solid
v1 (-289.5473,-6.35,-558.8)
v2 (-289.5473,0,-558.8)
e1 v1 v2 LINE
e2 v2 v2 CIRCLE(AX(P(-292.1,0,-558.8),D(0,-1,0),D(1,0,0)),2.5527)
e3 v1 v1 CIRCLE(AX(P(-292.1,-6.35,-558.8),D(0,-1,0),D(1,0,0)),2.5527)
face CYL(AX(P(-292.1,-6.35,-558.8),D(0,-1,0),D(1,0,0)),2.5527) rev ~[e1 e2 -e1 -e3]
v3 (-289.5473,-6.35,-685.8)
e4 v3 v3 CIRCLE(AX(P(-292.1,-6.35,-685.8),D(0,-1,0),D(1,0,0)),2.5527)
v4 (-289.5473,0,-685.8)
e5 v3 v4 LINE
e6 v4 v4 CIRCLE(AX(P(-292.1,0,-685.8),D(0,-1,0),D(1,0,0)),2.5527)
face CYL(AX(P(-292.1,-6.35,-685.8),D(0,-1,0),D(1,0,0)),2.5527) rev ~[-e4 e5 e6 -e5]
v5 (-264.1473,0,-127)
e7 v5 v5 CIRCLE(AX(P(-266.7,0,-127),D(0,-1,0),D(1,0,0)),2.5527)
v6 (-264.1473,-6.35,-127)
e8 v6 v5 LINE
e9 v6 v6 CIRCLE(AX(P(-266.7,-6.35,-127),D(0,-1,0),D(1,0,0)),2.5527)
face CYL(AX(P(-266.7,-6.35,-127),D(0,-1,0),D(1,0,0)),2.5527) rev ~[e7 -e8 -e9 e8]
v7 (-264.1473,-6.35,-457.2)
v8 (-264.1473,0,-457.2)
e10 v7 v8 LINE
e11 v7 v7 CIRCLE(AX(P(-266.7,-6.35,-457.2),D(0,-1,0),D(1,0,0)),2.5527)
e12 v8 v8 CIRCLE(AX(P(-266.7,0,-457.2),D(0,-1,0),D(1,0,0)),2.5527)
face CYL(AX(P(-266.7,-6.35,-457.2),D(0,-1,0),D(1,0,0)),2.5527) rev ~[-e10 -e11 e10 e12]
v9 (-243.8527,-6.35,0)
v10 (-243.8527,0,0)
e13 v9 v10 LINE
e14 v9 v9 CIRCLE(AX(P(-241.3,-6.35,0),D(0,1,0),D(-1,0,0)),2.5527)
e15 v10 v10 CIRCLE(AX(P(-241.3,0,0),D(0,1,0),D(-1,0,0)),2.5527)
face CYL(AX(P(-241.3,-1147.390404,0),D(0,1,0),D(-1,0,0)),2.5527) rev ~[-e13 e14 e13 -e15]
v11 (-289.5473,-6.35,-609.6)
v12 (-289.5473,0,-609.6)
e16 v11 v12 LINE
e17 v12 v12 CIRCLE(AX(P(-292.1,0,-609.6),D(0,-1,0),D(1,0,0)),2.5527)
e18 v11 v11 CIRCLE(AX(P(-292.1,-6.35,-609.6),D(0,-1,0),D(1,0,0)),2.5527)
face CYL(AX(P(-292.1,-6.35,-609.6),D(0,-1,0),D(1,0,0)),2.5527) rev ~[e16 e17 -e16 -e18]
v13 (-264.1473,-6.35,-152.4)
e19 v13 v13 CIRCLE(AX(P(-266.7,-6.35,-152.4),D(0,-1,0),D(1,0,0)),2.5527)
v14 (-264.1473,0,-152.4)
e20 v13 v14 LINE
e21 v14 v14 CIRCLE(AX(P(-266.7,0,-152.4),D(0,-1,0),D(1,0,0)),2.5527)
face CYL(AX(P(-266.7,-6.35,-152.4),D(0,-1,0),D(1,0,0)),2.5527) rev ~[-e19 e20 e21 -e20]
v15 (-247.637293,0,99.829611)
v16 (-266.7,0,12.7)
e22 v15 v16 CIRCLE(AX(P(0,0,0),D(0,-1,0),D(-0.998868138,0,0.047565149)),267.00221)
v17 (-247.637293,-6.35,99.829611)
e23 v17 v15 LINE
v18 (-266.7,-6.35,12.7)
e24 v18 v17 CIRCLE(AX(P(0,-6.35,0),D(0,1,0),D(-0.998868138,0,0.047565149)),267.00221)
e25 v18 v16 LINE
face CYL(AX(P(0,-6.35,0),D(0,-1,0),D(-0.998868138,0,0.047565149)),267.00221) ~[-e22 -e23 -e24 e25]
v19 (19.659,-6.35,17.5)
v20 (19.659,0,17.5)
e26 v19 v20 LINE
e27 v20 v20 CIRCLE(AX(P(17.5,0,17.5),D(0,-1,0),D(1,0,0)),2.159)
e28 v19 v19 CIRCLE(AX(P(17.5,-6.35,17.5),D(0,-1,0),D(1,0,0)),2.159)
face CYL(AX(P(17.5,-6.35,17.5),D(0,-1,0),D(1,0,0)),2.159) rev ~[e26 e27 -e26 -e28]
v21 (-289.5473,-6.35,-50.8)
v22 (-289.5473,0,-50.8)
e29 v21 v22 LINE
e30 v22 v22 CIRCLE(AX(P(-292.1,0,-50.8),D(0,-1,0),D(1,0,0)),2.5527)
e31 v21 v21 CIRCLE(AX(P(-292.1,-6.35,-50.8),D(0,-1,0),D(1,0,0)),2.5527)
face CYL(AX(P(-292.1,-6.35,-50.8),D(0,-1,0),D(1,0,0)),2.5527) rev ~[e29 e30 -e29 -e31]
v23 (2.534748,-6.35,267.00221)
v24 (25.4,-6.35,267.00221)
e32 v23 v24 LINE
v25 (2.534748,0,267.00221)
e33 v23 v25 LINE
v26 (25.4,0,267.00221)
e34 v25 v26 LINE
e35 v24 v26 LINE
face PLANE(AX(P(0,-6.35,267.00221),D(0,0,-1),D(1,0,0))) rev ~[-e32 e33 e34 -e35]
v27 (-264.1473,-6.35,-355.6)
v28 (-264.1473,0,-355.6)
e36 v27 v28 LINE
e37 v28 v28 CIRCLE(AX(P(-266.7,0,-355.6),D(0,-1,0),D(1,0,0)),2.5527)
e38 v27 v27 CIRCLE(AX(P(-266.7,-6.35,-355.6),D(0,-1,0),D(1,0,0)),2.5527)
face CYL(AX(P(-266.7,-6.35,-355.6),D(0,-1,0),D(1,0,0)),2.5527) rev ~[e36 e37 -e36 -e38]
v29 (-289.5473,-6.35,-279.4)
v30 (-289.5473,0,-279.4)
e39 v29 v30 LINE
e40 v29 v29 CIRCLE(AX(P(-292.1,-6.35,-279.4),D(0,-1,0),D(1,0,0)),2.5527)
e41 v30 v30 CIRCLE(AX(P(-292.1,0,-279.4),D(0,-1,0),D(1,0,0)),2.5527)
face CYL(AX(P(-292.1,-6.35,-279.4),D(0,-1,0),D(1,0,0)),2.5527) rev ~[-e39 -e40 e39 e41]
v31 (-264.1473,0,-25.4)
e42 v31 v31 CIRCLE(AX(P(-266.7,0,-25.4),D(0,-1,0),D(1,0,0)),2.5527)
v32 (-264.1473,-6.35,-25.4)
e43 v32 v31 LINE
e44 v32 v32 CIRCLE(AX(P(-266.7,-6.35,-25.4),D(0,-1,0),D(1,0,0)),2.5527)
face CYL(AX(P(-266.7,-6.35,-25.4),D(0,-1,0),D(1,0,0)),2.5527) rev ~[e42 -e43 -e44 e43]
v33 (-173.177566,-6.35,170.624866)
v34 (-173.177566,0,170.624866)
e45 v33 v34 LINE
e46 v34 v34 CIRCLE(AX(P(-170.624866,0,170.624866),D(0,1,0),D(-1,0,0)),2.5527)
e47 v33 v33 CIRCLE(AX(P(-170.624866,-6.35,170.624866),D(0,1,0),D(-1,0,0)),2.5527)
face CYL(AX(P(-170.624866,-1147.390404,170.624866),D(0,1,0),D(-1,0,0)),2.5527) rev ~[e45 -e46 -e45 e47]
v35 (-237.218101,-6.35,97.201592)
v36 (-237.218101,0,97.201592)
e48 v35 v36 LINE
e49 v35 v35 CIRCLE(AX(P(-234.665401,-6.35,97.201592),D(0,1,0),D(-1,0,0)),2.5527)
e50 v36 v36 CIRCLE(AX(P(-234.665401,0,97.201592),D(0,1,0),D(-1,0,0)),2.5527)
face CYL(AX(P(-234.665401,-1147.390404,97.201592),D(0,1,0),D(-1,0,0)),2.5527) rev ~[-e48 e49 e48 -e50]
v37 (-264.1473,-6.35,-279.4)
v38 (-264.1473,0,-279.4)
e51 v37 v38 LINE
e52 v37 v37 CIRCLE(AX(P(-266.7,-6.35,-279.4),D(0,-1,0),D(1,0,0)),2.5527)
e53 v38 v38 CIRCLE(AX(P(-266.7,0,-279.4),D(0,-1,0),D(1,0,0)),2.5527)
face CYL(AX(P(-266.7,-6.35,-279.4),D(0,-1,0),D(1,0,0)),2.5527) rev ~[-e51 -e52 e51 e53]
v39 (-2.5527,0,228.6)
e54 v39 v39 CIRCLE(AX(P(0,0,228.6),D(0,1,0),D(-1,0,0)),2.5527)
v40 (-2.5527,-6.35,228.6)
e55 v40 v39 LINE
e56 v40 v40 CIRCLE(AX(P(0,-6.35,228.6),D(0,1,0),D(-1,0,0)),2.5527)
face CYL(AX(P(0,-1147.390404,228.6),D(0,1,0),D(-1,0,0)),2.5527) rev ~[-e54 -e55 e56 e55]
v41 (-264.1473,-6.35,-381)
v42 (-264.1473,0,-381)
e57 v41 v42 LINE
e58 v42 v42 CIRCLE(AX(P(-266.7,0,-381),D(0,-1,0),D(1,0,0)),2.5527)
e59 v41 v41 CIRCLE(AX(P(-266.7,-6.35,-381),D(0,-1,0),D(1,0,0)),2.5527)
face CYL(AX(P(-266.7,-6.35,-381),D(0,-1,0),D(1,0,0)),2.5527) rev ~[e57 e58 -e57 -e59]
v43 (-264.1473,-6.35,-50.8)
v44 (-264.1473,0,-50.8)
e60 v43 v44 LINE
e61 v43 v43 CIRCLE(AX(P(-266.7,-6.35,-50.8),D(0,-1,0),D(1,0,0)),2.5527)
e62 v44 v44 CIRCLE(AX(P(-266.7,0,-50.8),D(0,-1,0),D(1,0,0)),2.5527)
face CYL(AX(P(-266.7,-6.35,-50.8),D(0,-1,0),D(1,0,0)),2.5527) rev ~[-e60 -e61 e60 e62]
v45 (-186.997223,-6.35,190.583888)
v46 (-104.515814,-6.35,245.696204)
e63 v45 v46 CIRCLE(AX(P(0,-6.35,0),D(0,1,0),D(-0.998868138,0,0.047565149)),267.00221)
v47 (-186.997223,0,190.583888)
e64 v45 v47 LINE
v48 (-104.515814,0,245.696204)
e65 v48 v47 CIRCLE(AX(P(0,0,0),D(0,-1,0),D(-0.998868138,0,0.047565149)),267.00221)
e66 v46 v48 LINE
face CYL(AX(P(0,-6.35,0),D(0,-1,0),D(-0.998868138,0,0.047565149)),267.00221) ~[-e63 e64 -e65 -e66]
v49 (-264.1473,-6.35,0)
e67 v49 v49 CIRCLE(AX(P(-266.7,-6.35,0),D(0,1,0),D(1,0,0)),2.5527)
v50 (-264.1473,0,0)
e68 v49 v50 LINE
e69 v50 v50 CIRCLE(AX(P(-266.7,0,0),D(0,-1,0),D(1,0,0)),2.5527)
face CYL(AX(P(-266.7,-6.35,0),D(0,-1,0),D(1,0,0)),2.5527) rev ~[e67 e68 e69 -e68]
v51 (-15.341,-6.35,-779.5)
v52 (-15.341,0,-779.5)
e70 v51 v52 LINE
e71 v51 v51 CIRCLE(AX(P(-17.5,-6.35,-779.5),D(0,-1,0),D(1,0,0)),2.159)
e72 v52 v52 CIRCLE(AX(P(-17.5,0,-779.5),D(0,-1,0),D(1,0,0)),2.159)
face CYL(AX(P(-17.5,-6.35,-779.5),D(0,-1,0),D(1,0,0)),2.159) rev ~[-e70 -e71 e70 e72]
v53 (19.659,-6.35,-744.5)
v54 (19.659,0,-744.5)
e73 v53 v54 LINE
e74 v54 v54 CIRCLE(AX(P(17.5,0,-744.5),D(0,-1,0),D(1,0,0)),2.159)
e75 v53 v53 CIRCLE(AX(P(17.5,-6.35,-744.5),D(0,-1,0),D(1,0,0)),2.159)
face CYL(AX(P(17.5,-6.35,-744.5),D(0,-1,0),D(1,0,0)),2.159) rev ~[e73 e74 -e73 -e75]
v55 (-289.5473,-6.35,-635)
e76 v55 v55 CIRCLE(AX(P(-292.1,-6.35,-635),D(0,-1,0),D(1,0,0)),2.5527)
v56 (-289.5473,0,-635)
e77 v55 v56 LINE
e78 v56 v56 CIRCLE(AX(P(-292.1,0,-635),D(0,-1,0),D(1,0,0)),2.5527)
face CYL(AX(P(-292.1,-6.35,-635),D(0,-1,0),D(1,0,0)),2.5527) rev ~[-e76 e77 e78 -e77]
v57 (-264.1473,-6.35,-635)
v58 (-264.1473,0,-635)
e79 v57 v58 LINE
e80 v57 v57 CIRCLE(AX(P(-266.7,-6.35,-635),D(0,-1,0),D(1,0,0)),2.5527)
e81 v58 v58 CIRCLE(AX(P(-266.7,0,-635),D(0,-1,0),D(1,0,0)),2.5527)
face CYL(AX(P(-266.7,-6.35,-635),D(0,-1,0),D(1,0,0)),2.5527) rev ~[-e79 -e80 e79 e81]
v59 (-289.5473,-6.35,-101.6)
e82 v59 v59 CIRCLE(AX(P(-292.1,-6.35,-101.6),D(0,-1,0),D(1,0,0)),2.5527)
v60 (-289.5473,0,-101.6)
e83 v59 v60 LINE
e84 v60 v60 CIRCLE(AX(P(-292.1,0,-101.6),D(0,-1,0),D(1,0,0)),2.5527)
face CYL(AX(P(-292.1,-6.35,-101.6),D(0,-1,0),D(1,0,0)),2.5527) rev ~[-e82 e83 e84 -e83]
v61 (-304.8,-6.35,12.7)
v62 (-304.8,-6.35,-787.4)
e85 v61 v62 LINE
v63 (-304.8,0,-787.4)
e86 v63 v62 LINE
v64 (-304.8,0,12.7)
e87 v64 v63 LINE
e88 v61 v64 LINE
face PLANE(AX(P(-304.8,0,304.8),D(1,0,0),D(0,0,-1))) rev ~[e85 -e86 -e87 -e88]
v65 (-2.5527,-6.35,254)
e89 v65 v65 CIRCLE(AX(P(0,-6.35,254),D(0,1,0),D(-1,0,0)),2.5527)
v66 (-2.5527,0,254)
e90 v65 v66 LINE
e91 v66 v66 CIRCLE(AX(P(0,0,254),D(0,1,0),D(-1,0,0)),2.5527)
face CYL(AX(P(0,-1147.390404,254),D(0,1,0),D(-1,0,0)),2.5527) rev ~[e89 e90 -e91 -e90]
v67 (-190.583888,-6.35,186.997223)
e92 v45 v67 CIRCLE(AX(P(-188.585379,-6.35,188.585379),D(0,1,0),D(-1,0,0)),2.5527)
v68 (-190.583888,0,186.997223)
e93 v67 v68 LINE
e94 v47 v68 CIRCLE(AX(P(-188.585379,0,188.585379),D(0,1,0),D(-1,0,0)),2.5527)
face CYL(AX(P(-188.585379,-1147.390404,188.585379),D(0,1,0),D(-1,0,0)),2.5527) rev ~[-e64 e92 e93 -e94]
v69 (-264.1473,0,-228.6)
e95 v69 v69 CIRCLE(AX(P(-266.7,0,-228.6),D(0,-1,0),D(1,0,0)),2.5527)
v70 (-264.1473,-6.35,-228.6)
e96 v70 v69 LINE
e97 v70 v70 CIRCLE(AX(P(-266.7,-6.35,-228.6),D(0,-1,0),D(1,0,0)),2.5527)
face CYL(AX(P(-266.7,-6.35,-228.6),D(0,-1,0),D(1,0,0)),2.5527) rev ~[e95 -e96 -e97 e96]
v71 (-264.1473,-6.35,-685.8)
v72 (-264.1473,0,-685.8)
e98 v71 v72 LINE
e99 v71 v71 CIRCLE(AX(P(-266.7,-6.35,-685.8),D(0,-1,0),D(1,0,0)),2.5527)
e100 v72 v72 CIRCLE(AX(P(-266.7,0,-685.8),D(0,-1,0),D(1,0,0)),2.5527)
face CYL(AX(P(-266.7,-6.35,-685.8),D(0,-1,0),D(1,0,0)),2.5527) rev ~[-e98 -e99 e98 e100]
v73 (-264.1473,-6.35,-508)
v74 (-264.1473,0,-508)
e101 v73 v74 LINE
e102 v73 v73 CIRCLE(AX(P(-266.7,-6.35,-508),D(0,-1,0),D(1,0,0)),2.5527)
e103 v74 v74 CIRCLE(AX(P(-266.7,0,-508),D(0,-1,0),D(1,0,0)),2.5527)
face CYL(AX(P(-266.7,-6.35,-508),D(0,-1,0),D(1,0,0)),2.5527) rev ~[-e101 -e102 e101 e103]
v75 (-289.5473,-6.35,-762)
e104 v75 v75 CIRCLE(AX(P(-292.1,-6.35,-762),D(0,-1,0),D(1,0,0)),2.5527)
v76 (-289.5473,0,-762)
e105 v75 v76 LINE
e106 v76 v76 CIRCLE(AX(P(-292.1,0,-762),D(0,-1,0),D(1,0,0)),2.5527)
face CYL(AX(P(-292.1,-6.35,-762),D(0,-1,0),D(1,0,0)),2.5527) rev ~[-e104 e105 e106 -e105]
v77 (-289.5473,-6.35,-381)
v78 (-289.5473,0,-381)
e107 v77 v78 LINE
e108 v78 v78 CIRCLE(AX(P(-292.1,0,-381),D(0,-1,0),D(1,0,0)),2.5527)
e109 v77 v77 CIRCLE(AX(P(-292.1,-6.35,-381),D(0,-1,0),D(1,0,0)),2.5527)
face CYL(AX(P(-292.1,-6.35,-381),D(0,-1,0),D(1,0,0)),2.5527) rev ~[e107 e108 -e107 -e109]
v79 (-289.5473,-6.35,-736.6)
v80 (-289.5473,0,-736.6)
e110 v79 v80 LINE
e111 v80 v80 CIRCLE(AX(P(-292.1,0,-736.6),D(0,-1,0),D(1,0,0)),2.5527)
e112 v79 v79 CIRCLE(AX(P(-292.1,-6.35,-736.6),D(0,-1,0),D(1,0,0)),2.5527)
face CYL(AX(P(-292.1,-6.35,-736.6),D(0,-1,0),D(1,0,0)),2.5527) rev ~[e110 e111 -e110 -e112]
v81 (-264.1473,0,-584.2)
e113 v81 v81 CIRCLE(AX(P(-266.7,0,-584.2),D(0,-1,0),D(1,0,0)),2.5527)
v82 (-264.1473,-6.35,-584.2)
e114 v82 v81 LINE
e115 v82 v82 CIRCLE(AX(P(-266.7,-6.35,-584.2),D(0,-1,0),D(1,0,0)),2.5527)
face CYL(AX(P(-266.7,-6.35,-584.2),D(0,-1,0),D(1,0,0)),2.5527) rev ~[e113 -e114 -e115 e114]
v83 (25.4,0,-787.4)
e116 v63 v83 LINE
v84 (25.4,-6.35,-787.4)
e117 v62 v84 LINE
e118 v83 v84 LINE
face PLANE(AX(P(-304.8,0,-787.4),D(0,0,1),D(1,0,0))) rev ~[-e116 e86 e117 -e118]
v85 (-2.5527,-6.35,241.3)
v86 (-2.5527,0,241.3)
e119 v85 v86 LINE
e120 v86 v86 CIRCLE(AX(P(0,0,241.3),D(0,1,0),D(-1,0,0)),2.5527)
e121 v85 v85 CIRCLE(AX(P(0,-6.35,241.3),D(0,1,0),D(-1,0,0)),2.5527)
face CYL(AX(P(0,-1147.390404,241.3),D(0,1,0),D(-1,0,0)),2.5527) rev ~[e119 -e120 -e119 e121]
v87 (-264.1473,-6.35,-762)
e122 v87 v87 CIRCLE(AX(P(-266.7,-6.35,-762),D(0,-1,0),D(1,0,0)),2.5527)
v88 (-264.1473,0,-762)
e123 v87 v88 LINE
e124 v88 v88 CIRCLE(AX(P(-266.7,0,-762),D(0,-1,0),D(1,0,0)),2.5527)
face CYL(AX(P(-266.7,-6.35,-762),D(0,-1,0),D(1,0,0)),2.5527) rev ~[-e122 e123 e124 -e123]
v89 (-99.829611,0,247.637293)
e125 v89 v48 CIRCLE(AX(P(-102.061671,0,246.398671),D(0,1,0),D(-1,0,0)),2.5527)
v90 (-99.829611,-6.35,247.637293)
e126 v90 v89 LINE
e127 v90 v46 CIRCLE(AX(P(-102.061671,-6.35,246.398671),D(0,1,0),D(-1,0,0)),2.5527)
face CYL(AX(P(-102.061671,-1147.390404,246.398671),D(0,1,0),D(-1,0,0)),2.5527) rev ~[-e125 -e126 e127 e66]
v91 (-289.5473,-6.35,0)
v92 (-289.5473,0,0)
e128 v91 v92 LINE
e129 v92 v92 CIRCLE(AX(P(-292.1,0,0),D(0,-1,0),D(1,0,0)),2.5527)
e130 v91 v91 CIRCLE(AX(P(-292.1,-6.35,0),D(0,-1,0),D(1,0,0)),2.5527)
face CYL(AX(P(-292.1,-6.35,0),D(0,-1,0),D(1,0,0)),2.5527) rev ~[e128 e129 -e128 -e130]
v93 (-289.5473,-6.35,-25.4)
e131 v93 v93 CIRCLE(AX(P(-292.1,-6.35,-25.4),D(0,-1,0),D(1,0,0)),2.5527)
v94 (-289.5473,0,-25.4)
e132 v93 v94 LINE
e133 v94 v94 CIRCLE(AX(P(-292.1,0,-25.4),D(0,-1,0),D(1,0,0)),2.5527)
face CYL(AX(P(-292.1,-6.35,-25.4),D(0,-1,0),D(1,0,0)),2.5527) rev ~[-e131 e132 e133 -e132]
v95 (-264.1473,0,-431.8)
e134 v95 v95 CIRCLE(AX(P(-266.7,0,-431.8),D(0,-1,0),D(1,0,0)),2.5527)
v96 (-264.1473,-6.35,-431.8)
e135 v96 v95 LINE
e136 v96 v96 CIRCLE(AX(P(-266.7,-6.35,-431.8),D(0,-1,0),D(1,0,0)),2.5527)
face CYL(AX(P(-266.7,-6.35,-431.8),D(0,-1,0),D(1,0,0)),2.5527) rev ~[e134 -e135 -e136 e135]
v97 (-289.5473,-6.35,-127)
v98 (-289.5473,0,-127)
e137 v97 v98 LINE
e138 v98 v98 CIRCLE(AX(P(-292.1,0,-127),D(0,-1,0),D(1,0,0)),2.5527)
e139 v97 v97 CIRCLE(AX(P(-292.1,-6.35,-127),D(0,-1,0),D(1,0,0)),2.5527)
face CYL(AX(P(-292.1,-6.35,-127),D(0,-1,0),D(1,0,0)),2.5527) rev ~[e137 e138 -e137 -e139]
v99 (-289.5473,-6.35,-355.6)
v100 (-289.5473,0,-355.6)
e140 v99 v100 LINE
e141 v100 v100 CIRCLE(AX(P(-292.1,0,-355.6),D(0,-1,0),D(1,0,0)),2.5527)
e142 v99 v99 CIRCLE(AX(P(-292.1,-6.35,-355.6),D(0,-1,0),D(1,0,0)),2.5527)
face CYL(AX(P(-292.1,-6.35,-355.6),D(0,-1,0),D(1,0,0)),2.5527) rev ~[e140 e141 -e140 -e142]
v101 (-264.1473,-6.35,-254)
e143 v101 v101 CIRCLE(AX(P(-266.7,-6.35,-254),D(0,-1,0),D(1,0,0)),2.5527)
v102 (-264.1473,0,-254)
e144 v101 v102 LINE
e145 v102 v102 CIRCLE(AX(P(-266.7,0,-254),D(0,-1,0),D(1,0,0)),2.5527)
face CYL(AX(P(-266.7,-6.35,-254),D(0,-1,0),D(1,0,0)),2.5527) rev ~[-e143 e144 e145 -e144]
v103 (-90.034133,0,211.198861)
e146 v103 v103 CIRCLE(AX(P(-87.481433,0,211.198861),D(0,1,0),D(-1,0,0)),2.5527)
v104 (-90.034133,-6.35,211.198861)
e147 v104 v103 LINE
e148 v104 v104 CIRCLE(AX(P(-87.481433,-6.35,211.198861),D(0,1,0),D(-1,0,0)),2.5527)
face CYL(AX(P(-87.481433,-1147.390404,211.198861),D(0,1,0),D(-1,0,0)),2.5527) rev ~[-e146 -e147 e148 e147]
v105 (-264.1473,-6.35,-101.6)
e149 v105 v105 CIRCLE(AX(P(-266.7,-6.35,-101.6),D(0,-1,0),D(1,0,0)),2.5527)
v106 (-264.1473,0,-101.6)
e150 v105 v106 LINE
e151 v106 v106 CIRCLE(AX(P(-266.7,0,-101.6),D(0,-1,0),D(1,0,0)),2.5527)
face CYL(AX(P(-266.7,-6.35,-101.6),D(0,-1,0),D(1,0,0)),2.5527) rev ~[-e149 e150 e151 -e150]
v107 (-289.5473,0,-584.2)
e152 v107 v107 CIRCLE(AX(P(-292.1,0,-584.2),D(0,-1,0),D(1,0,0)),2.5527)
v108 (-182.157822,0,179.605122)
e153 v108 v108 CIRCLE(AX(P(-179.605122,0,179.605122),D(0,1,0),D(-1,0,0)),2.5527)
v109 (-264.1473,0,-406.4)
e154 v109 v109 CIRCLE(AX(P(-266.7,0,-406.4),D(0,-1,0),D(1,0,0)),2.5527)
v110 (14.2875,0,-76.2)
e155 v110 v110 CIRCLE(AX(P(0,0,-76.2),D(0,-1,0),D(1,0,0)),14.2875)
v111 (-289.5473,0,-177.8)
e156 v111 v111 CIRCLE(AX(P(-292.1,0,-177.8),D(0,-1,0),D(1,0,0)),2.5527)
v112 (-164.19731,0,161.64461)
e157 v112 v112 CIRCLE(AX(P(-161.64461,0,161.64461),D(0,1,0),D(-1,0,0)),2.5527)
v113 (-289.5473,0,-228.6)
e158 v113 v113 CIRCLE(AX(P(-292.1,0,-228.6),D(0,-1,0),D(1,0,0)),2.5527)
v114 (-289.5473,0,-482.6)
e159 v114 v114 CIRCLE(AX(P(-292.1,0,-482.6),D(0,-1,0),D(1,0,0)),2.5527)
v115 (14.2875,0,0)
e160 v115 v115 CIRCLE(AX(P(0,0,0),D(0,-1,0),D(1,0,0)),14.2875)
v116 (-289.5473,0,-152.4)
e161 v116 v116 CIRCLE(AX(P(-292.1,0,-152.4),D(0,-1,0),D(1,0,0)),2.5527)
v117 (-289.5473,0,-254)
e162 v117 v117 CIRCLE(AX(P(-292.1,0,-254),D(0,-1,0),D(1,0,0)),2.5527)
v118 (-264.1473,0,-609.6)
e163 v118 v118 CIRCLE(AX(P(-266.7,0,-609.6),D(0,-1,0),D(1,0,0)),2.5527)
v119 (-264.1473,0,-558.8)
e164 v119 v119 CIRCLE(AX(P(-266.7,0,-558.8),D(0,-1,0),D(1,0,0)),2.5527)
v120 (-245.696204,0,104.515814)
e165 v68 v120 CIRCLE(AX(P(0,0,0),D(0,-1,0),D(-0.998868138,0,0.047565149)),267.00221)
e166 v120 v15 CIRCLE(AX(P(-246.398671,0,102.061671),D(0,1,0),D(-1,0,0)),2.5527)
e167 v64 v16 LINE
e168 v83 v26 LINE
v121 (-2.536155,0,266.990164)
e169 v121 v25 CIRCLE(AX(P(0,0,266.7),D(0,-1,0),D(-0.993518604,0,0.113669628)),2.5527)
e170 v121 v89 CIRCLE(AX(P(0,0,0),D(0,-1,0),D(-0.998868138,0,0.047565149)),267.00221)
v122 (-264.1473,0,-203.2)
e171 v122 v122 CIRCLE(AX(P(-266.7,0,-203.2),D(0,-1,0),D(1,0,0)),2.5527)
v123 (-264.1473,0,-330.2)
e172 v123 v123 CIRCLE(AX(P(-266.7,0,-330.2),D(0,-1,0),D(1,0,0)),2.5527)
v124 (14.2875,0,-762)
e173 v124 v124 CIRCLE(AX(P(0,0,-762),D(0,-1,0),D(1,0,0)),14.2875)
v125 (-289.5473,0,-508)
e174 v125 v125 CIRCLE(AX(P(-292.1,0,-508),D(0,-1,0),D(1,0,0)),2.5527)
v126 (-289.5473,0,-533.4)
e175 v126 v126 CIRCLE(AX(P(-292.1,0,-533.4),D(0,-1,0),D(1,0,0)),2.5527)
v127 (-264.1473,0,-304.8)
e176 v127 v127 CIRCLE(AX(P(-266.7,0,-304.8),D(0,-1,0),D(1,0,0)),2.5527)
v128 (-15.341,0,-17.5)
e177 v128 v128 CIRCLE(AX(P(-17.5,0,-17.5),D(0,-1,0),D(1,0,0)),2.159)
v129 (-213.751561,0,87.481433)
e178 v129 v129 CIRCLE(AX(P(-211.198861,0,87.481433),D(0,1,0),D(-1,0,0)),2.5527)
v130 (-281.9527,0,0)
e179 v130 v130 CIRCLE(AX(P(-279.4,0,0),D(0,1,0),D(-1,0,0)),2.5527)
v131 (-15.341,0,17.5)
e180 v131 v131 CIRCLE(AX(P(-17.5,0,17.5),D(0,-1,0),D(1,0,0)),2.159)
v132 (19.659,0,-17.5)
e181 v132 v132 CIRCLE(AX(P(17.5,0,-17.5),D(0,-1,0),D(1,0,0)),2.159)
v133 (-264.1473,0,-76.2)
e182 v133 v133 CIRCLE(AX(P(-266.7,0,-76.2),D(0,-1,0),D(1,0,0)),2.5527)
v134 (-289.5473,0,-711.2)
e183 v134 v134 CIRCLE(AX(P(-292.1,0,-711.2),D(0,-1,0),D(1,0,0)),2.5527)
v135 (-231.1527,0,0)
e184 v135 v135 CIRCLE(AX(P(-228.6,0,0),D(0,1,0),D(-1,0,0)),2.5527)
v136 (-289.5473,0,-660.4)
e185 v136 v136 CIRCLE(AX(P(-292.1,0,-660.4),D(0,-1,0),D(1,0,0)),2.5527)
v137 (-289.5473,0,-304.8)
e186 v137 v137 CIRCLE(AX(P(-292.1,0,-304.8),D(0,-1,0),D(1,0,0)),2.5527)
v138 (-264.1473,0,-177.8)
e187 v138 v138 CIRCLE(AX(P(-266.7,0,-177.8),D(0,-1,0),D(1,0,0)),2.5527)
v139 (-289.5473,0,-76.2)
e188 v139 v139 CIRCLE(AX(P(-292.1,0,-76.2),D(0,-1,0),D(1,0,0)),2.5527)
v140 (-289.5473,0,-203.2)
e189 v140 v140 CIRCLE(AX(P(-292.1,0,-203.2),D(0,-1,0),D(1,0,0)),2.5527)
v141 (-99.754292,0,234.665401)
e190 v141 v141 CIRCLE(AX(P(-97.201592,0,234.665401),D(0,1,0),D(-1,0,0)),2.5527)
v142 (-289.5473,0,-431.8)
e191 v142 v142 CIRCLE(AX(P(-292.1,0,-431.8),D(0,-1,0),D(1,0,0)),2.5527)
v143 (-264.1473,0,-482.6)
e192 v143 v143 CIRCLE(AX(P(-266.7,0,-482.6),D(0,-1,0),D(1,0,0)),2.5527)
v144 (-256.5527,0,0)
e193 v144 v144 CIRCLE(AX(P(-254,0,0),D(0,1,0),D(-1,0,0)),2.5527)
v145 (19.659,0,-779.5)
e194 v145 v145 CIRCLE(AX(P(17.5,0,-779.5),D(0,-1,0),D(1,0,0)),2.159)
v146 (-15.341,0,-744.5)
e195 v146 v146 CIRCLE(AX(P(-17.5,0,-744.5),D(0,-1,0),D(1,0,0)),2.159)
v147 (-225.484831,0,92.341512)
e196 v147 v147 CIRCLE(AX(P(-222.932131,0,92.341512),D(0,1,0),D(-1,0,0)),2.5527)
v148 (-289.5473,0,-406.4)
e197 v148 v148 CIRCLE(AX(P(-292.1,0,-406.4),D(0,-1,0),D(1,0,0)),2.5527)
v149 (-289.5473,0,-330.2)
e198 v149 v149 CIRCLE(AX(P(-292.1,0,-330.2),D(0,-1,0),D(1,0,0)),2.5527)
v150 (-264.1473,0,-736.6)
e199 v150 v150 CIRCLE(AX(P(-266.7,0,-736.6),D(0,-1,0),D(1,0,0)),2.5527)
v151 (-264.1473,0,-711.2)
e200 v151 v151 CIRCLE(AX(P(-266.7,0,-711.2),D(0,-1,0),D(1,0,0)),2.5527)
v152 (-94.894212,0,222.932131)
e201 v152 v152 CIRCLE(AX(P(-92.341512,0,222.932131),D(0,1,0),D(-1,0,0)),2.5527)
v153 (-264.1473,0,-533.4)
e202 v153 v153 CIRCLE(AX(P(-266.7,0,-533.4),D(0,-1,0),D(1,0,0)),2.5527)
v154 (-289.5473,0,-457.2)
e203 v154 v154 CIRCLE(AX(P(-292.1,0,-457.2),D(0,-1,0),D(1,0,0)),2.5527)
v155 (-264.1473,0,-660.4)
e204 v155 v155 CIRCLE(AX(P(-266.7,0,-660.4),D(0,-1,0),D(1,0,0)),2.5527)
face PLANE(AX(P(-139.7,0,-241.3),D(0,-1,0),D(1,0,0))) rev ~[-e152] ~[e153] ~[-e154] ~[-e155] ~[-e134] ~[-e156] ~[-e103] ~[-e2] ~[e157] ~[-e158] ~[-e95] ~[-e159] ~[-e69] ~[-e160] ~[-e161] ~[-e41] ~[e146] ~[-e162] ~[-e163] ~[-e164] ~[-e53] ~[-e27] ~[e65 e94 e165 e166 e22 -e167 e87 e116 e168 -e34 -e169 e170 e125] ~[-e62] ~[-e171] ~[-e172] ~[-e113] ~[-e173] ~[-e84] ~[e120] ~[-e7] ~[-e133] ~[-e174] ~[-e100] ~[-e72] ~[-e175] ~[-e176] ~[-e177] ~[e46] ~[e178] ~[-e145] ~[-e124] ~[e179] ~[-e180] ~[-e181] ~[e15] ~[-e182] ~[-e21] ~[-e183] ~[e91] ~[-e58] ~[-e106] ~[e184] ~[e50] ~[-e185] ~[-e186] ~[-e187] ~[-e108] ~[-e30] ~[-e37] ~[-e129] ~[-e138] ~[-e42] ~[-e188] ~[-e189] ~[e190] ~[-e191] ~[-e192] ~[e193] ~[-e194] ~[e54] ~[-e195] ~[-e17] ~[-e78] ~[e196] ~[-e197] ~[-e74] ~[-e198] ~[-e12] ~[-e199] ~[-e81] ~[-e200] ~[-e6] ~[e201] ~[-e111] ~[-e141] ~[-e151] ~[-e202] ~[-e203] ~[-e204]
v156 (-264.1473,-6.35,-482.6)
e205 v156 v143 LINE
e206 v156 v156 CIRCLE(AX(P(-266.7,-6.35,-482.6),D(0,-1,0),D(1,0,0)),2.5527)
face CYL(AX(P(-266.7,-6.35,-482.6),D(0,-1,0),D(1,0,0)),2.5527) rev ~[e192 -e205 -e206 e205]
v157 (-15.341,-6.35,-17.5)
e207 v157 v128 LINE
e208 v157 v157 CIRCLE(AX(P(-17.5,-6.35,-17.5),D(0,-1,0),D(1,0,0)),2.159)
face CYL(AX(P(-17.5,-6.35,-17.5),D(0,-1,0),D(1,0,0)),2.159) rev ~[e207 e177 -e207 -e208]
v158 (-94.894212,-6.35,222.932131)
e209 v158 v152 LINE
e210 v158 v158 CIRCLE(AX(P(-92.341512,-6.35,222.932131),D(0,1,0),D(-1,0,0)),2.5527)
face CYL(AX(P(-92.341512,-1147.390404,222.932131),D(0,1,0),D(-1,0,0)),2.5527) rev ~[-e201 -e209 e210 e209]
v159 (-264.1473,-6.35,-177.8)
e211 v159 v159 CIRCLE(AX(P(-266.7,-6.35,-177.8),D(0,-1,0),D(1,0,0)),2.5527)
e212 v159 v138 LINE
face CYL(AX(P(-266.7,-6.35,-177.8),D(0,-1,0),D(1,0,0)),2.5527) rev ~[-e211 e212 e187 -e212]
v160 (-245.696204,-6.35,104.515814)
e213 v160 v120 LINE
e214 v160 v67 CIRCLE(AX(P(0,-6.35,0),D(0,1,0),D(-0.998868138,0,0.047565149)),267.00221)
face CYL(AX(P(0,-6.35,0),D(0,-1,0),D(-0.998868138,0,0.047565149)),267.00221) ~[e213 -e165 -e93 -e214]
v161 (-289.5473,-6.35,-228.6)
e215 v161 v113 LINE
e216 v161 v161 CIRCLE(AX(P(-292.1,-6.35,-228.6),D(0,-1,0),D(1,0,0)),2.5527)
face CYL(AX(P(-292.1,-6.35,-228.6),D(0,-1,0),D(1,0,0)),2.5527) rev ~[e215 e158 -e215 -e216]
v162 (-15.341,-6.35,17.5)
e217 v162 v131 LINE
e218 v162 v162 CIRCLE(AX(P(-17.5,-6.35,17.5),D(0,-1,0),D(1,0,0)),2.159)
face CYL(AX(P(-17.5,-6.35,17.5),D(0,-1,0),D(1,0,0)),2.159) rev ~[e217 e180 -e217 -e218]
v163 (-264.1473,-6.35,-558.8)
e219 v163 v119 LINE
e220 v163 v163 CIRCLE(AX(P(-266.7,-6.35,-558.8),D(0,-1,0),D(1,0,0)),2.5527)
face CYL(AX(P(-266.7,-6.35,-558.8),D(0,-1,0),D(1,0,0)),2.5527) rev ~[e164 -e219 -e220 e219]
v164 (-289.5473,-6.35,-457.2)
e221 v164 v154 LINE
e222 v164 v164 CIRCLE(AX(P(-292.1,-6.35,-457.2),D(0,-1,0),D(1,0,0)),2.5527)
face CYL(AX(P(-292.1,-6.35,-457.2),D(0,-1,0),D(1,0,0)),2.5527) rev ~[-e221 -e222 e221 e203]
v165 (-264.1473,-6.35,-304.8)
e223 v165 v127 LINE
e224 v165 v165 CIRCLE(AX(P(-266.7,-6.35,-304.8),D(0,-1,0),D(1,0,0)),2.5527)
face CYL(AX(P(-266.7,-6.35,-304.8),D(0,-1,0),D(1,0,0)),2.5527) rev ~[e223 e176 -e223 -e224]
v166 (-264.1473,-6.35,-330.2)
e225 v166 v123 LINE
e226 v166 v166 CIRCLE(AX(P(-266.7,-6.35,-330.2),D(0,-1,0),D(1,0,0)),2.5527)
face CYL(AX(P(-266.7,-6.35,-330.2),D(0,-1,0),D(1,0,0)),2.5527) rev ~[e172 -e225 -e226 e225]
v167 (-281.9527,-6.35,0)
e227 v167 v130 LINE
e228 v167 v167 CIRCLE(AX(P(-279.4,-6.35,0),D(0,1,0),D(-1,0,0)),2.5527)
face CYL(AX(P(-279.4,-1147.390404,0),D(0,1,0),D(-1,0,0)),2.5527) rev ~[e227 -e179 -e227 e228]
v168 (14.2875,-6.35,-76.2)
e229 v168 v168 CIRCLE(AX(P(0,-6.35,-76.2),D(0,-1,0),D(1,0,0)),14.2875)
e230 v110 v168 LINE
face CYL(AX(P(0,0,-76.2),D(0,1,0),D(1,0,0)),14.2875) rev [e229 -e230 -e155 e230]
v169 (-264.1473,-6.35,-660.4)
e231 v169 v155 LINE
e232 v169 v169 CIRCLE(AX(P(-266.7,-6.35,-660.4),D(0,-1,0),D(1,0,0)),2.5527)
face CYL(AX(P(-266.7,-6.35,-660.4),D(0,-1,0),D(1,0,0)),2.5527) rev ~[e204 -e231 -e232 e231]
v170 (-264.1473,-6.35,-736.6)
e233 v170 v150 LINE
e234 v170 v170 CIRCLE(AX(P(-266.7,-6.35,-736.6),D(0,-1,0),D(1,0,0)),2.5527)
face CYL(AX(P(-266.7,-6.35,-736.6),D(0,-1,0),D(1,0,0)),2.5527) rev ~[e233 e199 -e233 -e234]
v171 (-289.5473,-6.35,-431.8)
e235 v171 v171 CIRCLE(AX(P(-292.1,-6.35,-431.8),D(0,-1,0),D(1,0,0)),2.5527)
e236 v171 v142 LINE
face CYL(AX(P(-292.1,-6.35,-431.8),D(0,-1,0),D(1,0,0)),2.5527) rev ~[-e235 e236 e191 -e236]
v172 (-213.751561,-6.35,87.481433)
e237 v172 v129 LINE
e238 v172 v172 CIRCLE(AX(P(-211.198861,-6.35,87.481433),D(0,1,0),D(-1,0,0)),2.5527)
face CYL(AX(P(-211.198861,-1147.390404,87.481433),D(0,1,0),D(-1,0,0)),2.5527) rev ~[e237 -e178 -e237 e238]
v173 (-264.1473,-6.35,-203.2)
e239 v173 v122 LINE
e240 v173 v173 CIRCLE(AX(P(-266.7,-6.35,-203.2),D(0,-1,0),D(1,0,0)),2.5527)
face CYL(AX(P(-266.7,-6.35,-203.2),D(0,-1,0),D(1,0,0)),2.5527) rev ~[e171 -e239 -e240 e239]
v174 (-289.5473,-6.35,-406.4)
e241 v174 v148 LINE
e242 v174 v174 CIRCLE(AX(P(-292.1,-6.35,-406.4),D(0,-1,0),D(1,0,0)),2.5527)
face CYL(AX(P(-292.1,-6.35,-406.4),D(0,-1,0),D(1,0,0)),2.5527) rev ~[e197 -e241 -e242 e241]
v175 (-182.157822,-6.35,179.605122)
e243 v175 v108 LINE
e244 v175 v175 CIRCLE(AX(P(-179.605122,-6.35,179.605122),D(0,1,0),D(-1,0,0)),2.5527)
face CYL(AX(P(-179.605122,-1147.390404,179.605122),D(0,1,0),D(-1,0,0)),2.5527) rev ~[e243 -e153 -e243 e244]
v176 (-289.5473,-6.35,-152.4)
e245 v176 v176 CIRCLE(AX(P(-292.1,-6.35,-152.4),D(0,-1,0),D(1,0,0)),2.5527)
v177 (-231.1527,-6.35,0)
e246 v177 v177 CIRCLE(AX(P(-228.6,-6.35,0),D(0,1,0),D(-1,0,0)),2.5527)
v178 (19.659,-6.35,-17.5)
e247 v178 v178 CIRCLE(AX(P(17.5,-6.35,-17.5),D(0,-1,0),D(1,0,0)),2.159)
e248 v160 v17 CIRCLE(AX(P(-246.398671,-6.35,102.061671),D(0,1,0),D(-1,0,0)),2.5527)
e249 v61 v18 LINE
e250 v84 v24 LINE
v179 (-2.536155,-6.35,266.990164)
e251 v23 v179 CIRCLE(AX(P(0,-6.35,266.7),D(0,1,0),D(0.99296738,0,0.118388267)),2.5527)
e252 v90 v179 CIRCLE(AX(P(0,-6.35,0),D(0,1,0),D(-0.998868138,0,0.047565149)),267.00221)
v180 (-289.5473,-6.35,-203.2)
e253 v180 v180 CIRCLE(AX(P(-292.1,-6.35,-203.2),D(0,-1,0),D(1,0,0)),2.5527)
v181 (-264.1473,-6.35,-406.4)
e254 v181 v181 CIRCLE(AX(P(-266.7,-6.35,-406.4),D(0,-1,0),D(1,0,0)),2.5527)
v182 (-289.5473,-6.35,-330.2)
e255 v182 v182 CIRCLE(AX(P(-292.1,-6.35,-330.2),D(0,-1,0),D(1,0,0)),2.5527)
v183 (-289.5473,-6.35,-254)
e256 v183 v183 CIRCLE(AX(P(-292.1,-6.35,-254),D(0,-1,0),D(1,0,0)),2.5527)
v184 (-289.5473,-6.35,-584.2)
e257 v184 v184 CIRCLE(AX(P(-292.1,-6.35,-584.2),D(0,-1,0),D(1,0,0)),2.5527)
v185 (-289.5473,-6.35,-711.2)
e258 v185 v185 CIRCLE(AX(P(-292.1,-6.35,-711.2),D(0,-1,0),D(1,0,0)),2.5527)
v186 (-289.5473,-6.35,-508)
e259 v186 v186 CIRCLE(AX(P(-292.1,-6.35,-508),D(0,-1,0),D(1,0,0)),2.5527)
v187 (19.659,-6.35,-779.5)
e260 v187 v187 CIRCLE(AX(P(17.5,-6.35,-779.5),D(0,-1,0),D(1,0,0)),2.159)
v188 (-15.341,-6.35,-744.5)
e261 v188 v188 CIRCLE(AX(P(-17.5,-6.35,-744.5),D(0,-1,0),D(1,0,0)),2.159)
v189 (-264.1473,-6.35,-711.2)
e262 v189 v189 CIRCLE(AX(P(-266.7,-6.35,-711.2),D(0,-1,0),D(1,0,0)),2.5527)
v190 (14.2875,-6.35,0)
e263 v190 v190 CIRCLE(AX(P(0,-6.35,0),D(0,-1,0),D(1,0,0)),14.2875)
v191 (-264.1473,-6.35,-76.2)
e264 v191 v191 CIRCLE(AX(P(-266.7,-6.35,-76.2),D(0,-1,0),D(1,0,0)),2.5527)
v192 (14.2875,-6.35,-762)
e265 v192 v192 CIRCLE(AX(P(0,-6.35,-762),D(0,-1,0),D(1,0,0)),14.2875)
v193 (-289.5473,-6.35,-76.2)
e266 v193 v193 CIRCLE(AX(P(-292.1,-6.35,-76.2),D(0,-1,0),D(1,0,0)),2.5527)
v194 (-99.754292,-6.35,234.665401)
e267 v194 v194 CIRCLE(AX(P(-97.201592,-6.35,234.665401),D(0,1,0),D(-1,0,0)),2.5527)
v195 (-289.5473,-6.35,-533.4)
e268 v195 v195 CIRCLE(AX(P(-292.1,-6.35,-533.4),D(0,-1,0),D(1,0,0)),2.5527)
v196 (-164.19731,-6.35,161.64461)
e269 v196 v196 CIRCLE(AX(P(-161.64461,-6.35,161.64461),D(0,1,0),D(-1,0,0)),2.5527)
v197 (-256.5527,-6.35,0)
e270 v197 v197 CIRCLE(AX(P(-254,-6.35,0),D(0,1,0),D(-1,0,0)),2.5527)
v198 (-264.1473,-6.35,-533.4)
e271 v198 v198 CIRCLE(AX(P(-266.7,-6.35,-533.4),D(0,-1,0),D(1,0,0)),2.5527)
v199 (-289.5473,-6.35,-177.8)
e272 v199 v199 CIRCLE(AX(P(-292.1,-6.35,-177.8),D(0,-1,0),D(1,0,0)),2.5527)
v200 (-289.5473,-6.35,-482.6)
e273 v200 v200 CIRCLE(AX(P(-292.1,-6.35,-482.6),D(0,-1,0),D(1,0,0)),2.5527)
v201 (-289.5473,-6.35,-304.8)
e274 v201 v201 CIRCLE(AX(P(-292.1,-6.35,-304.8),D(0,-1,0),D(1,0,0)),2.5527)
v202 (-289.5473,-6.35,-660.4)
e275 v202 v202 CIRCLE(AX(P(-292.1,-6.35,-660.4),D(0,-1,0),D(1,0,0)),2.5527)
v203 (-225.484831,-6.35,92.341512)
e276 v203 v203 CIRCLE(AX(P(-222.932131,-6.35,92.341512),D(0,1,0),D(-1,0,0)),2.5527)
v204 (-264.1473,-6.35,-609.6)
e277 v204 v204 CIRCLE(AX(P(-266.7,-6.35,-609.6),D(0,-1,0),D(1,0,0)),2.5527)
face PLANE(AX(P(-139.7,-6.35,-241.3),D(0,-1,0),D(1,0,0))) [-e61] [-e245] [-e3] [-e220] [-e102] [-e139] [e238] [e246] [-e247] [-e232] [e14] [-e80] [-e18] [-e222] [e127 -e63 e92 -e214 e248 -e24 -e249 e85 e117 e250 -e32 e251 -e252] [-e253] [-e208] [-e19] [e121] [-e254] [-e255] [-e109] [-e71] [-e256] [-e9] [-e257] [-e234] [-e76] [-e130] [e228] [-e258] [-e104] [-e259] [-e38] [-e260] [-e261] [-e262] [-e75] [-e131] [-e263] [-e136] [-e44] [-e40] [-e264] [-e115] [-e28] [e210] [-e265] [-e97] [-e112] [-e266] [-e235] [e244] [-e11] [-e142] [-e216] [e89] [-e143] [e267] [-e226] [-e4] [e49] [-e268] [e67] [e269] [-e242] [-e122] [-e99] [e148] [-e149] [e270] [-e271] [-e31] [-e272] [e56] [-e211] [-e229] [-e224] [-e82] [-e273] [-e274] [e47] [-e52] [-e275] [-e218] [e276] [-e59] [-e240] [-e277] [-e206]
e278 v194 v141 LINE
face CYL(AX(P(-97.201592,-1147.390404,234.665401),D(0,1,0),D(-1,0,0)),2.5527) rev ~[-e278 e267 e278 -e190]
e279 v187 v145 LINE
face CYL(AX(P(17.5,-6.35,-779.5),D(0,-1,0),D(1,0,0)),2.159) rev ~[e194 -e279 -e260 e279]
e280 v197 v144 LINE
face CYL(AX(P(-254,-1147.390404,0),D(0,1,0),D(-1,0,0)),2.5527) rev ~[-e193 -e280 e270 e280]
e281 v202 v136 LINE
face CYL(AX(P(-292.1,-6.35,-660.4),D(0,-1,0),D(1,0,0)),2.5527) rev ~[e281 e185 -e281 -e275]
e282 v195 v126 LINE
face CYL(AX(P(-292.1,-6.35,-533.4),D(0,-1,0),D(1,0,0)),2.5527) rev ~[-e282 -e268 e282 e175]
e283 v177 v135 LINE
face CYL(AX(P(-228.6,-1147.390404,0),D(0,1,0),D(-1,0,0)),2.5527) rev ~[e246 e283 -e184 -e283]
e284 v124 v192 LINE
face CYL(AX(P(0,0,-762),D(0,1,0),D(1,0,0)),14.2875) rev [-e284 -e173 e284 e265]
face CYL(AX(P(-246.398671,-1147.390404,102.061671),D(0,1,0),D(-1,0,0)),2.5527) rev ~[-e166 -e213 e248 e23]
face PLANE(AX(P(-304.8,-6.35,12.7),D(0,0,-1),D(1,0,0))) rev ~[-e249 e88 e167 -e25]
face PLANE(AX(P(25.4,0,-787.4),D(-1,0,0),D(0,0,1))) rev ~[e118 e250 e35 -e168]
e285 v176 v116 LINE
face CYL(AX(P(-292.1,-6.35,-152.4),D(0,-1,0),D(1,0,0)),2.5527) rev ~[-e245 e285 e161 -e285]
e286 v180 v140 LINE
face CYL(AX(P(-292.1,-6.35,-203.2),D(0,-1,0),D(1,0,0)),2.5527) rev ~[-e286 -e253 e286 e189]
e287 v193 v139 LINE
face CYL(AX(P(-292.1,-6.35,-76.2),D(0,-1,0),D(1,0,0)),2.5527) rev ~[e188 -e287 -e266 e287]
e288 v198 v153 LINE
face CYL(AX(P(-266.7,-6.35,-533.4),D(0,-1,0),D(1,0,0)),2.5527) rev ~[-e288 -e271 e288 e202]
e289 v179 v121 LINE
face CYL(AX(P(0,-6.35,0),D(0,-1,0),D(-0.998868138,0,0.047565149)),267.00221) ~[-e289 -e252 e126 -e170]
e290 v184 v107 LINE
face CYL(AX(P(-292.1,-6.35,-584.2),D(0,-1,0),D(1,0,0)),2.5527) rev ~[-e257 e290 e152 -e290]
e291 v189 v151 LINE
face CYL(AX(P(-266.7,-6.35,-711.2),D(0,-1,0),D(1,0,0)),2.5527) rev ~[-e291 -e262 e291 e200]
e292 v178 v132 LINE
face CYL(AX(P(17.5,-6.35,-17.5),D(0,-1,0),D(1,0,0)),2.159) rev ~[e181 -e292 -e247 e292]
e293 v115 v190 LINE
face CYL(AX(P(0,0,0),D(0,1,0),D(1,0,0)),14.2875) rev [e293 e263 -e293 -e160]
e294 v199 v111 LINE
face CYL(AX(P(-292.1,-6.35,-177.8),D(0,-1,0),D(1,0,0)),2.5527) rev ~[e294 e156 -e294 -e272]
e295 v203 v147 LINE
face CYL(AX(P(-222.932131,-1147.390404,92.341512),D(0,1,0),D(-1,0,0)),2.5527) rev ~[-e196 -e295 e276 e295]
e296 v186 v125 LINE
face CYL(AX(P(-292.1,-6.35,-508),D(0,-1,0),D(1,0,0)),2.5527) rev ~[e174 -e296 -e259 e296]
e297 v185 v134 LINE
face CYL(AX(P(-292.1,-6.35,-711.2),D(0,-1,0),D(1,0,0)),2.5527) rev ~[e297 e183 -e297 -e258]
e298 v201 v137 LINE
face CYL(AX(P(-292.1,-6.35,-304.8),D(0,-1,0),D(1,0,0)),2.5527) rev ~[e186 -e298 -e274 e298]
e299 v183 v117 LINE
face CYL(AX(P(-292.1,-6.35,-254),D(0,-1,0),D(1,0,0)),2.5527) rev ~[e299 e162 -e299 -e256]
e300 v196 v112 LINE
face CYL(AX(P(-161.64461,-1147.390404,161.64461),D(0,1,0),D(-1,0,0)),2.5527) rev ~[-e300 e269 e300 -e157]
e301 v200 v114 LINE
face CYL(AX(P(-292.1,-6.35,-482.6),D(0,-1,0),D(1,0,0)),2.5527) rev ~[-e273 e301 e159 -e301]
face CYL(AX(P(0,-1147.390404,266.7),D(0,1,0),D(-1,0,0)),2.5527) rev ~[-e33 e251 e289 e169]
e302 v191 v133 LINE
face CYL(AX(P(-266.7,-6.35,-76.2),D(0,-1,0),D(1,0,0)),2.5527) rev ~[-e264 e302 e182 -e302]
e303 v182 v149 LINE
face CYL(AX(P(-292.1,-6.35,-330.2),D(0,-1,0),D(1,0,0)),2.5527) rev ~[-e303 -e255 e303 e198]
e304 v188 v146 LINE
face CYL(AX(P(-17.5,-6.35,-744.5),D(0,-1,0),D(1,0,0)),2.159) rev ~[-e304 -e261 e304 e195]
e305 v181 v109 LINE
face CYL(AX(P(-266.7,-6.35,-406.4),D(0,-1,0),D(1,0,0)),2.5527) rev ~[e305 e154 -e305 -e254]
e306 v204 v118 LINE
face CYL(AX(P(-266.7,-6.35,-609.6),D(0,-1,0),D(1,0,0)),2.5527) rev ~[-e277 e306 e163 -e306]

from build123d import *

# Parameters (mm, degrees)
F0_R     = 14.2875
F1_DEPTH = 6.35
F2_R     = 2.5527
F3_DEPTH = 25.4
F4_R     = 2.159
F5_DEPTH = 25.4
F7_D     = 5.1054
F9_DEPTH = 25.4


# Not quite as in the source:
# - a feature names something its author has since deleted; it is built from what else it names


with BuildPart() as f1:
    # F0 (on Front) → F1 (new body)
    with BuildSketch(Plane.XZ):
        Polygon((25.4, -787.4), (25.4, 0), (25.4, 304.8), (-304.8, 304.8), (-304.8, 0), (-304.8, -787.4), align=None)
        with Locations((0, -762)):
            Circle(F0_R, mode=Mode.SUBTRACT)
        with Locations((0, -76.2)):
            Circle(F0_R, mode=Mode.SUBTRACT)
        Circle(F0_R, mode=Mode.SUBTRACT)
    extrude(amount=F1_DEPTH)

    # F2 (on face) → F3 (cut)
    with BuildSketch(Plane.XZ.offset(6.35)):
        with Locations((-292.1, -25.4)):
            Circle(F2_R)
        with Locations((-292.1, -50.8)):
            Circle(F2_R)
        with Locations((-266.7, -50.8)):
            Circle(F2_R)
        with Locations((-266.7, -25.4)):
            Circle(F2_R)
        with Locations((-266.7, 0)):
            Circle(F2_R)
        with Locations((-292.1, 0)):
            Circle(F2_R)
        with Locations((-292.1, -76.2)):
            Circle(F2_R)
        with Locations((-266.7, -76.2)):
            Circle(F2_R)
        with Locations((-292.1, -101.6)):
            Circle(F2_R)
        with Locations((-266.7, -101.6)):
            Circle(F2_R)
        with Locations((-266.7, -127)):
            Circle(F2_R)
        with Locations((-292.1, -127)):
            Circle(F2_R)
        with Locations((-292.1, -152.4)):
            Circle(F2_R)
        with Locations((-266.7, -152.4)):
            Circle(F2_R)
        with Locations((-292.1, -177.8)):
            Circle(F2_R)
        with Locations((-266.7, -177.8)):
            Circle(F2_R)
        with Locations((-266.7, -203.2)):
            Circle(F2_R)
        with Locations((-292.1, -203.2)):
            Circle(F2_R)
        with Locations((-292.1, -228.6)):
            Circle(F2_R)
        with Locations((-266.7, -228.6)):
            Circle(F2_R)
        with Locations((-292.1, -254)):
            Circle(F2_R)
        with Locations((-266.7, -254)):
            Circle(F2_R)
        with Locations((-266.7, -279.4)):
            Circle(F2_R)
        with Locations((-292.1, -279.4)):
            Circle(F2_R)
        with Locations((-292.1, -304.8)):
            Circle(F2_R)
        with Locations((-266.7, -304.8)):
            Circle(F2_R)
        with Locations((-266.7, -330.2)):
            Circle(F2_R)
        with Locations((-292.1, -330.2)):
            Circle(F2_R)
        with Locations((-292.1, -355.6)):
            Circle(F2_R)
        with Locations((-266.7, -355.6)):
            Circle(F2_R)
        with Locations((-266.7, -381)):
            Circle(F2_R)
        with Locations((-292.1, -381)):
            Circle(F2_R)
        with Locations((-266.7, -406.4)):
            Circle(F2_R)
        with Locations((-292.1, -406.4)):
            Circle(F2_R)
        with Locations((-292.1, -431.8)):
            Circle(F2_R)
        with Locations((-266.7, -431.8)):
            Circle(F2_R)
        with Locations((-266.7, -457.2)):
            Circle(F2_R)
        with Locations((-292.1, -457.2)):
            Circle(F2_R)
        with Locations((-266.7, -482.6)):
            Circle(F2_R)
        with Locations((-292.1, -482.6)):
            Circle(F2_R)
        with Locations((-292.1, -508)):
            Circle(F2_R)
        with Locations((-266.7, -508)):
            Circle(F2_R)
        with Locations((-266.7, -533.4)):
            Circle(F2_R)
        with Locations((-292.1, -533.4)):
            Circle(F2_R)
        with Locations((-266.7, -558.8)):
            Circle(F2_R)
        with Locations((-292.1, -558.8)):
            Circle(F2_R)
        with Locations((-292.1, -584.2)):
            Circle(F2_R)
        with Locations((-266.7, -584.2)):
            Circle(F2_R)
        with Locations((-266.7, -609.6)):
            Circle(F2_R)
        with Locations((-292.1, -609.6)):
            Circle(F2_R)
        with Locations((-266.7, -635)):
            Circle(F2_R)
        with Locations((-292.1, -635)):
            Circle(F2_R)
        with Locations((-292.1, -660.4)):
            Circle(F2_R)
        with Locations((-266.7, -660.4)):
            Circle(F2_R)
        with Locations((-266.7, -685.8)):
            Circle(F2_R)
        with Locations((-292.1, -685.8)):
            Circle(F2_R)
        with Locations((-266.7, -711.2)):
            Circle(F2_R)
        with Locations((-292.1, -711.2)):
            Circle(F2_R)
        with Locations((-292.1, -736.6)):
            Circle(F2_R)
        with Locations((-266.7, -736.6)):
            Circle(F2_R)
        with Locations((-266.7, -762)):
            Circle(F2_R)
        with Locations((-292.1, -762)):
            Circle(F2_R)
    extrude(amount=-F3_DEPTH, mode=Mode.SUBTRACT)

    # F4 (on face) → F5 (cut)
    with BuildSketch(Plane.XZ.offset(6.35)):
        with Locations((-17.5, -744.5)):
            Circle(F4_R)
        with Locations((17.5, -744.5)):
            Circle(F4_R)
        with Locations((17.5, -779.5)):
            Circle(F4_R)
        with Locations((-17.5, -779.5)):
            Circle(F4_R)
        with Locations((17.5, -17.5)):
            Circle(F4_R)
        with Locations((17.5, 17.5)):
            Circle(F4_R)
        with Locations((-17.5, 17.5)):
            Circle(F4_R)
        with Locations((-17.5, -17.5)):
            Circle(F4_R)
    extrude(amount=-F5_DEPTH, mode=Mode.SUBTRACT)

    # F7 (through all)
    with Locations(Plane.XZ.offset(6.35)):
        with Locations((-87.4814326387, 211.1988611321), (-92.3415122297, 222.932131195), (-97.2015918207, 234.6654012579), (-102.0616714118, 246.3986713208), (-106.9217510028, 258.1319413837), (0, 266.7), (0, 254), (0, 241.3), (0, 228.6), (0, 279.4), (-266.7, 0), (-254, 0), (-279.4, 0), (-258.1319413837, 106.9217510028), (-246.3986713208, 102.0616714118), (-234.6654012579, 97.2015918207), (-241.3, 0), (-228.6, 0), (-222.932131195, 92.3415122297), (-161.6446101792, 161.6446101792), (-170.6248663003, 170.6248663003), (-188.5853785425, 188.5853785425), (-179.6051224214, 179.6051224214), (-211.1988611321, 87.4814326387), (-197.5656346635, 197.5656346635)):
            Hole(F7_D / 2)

    # F8 (on face) → F9 (cut)
    with BuildSketch(Plane.XZ.offset(6.35)):
        with BuildLine():
            Line((-304.8, 304.8), (-304.8, 12.7))
            Line((-304.8, 12.7), (-266.7, 12.7))
            ThreePointArc((-266.7, 12.7), (-184.2542427414, 193.2370410449), (0, 267.0022097287))
            Line((0, 267.0022097287), (25.4, 267.0022097287))
            Line((25.4, 267.0022097287), (25.4, 304.8))
            Line((25.4, 304.8), (-304.8, 304.8))
        make_face()
    extrude(amount=-F9_DEPTH, mode=Mode.SUBTRACT)


solid = f1.part
